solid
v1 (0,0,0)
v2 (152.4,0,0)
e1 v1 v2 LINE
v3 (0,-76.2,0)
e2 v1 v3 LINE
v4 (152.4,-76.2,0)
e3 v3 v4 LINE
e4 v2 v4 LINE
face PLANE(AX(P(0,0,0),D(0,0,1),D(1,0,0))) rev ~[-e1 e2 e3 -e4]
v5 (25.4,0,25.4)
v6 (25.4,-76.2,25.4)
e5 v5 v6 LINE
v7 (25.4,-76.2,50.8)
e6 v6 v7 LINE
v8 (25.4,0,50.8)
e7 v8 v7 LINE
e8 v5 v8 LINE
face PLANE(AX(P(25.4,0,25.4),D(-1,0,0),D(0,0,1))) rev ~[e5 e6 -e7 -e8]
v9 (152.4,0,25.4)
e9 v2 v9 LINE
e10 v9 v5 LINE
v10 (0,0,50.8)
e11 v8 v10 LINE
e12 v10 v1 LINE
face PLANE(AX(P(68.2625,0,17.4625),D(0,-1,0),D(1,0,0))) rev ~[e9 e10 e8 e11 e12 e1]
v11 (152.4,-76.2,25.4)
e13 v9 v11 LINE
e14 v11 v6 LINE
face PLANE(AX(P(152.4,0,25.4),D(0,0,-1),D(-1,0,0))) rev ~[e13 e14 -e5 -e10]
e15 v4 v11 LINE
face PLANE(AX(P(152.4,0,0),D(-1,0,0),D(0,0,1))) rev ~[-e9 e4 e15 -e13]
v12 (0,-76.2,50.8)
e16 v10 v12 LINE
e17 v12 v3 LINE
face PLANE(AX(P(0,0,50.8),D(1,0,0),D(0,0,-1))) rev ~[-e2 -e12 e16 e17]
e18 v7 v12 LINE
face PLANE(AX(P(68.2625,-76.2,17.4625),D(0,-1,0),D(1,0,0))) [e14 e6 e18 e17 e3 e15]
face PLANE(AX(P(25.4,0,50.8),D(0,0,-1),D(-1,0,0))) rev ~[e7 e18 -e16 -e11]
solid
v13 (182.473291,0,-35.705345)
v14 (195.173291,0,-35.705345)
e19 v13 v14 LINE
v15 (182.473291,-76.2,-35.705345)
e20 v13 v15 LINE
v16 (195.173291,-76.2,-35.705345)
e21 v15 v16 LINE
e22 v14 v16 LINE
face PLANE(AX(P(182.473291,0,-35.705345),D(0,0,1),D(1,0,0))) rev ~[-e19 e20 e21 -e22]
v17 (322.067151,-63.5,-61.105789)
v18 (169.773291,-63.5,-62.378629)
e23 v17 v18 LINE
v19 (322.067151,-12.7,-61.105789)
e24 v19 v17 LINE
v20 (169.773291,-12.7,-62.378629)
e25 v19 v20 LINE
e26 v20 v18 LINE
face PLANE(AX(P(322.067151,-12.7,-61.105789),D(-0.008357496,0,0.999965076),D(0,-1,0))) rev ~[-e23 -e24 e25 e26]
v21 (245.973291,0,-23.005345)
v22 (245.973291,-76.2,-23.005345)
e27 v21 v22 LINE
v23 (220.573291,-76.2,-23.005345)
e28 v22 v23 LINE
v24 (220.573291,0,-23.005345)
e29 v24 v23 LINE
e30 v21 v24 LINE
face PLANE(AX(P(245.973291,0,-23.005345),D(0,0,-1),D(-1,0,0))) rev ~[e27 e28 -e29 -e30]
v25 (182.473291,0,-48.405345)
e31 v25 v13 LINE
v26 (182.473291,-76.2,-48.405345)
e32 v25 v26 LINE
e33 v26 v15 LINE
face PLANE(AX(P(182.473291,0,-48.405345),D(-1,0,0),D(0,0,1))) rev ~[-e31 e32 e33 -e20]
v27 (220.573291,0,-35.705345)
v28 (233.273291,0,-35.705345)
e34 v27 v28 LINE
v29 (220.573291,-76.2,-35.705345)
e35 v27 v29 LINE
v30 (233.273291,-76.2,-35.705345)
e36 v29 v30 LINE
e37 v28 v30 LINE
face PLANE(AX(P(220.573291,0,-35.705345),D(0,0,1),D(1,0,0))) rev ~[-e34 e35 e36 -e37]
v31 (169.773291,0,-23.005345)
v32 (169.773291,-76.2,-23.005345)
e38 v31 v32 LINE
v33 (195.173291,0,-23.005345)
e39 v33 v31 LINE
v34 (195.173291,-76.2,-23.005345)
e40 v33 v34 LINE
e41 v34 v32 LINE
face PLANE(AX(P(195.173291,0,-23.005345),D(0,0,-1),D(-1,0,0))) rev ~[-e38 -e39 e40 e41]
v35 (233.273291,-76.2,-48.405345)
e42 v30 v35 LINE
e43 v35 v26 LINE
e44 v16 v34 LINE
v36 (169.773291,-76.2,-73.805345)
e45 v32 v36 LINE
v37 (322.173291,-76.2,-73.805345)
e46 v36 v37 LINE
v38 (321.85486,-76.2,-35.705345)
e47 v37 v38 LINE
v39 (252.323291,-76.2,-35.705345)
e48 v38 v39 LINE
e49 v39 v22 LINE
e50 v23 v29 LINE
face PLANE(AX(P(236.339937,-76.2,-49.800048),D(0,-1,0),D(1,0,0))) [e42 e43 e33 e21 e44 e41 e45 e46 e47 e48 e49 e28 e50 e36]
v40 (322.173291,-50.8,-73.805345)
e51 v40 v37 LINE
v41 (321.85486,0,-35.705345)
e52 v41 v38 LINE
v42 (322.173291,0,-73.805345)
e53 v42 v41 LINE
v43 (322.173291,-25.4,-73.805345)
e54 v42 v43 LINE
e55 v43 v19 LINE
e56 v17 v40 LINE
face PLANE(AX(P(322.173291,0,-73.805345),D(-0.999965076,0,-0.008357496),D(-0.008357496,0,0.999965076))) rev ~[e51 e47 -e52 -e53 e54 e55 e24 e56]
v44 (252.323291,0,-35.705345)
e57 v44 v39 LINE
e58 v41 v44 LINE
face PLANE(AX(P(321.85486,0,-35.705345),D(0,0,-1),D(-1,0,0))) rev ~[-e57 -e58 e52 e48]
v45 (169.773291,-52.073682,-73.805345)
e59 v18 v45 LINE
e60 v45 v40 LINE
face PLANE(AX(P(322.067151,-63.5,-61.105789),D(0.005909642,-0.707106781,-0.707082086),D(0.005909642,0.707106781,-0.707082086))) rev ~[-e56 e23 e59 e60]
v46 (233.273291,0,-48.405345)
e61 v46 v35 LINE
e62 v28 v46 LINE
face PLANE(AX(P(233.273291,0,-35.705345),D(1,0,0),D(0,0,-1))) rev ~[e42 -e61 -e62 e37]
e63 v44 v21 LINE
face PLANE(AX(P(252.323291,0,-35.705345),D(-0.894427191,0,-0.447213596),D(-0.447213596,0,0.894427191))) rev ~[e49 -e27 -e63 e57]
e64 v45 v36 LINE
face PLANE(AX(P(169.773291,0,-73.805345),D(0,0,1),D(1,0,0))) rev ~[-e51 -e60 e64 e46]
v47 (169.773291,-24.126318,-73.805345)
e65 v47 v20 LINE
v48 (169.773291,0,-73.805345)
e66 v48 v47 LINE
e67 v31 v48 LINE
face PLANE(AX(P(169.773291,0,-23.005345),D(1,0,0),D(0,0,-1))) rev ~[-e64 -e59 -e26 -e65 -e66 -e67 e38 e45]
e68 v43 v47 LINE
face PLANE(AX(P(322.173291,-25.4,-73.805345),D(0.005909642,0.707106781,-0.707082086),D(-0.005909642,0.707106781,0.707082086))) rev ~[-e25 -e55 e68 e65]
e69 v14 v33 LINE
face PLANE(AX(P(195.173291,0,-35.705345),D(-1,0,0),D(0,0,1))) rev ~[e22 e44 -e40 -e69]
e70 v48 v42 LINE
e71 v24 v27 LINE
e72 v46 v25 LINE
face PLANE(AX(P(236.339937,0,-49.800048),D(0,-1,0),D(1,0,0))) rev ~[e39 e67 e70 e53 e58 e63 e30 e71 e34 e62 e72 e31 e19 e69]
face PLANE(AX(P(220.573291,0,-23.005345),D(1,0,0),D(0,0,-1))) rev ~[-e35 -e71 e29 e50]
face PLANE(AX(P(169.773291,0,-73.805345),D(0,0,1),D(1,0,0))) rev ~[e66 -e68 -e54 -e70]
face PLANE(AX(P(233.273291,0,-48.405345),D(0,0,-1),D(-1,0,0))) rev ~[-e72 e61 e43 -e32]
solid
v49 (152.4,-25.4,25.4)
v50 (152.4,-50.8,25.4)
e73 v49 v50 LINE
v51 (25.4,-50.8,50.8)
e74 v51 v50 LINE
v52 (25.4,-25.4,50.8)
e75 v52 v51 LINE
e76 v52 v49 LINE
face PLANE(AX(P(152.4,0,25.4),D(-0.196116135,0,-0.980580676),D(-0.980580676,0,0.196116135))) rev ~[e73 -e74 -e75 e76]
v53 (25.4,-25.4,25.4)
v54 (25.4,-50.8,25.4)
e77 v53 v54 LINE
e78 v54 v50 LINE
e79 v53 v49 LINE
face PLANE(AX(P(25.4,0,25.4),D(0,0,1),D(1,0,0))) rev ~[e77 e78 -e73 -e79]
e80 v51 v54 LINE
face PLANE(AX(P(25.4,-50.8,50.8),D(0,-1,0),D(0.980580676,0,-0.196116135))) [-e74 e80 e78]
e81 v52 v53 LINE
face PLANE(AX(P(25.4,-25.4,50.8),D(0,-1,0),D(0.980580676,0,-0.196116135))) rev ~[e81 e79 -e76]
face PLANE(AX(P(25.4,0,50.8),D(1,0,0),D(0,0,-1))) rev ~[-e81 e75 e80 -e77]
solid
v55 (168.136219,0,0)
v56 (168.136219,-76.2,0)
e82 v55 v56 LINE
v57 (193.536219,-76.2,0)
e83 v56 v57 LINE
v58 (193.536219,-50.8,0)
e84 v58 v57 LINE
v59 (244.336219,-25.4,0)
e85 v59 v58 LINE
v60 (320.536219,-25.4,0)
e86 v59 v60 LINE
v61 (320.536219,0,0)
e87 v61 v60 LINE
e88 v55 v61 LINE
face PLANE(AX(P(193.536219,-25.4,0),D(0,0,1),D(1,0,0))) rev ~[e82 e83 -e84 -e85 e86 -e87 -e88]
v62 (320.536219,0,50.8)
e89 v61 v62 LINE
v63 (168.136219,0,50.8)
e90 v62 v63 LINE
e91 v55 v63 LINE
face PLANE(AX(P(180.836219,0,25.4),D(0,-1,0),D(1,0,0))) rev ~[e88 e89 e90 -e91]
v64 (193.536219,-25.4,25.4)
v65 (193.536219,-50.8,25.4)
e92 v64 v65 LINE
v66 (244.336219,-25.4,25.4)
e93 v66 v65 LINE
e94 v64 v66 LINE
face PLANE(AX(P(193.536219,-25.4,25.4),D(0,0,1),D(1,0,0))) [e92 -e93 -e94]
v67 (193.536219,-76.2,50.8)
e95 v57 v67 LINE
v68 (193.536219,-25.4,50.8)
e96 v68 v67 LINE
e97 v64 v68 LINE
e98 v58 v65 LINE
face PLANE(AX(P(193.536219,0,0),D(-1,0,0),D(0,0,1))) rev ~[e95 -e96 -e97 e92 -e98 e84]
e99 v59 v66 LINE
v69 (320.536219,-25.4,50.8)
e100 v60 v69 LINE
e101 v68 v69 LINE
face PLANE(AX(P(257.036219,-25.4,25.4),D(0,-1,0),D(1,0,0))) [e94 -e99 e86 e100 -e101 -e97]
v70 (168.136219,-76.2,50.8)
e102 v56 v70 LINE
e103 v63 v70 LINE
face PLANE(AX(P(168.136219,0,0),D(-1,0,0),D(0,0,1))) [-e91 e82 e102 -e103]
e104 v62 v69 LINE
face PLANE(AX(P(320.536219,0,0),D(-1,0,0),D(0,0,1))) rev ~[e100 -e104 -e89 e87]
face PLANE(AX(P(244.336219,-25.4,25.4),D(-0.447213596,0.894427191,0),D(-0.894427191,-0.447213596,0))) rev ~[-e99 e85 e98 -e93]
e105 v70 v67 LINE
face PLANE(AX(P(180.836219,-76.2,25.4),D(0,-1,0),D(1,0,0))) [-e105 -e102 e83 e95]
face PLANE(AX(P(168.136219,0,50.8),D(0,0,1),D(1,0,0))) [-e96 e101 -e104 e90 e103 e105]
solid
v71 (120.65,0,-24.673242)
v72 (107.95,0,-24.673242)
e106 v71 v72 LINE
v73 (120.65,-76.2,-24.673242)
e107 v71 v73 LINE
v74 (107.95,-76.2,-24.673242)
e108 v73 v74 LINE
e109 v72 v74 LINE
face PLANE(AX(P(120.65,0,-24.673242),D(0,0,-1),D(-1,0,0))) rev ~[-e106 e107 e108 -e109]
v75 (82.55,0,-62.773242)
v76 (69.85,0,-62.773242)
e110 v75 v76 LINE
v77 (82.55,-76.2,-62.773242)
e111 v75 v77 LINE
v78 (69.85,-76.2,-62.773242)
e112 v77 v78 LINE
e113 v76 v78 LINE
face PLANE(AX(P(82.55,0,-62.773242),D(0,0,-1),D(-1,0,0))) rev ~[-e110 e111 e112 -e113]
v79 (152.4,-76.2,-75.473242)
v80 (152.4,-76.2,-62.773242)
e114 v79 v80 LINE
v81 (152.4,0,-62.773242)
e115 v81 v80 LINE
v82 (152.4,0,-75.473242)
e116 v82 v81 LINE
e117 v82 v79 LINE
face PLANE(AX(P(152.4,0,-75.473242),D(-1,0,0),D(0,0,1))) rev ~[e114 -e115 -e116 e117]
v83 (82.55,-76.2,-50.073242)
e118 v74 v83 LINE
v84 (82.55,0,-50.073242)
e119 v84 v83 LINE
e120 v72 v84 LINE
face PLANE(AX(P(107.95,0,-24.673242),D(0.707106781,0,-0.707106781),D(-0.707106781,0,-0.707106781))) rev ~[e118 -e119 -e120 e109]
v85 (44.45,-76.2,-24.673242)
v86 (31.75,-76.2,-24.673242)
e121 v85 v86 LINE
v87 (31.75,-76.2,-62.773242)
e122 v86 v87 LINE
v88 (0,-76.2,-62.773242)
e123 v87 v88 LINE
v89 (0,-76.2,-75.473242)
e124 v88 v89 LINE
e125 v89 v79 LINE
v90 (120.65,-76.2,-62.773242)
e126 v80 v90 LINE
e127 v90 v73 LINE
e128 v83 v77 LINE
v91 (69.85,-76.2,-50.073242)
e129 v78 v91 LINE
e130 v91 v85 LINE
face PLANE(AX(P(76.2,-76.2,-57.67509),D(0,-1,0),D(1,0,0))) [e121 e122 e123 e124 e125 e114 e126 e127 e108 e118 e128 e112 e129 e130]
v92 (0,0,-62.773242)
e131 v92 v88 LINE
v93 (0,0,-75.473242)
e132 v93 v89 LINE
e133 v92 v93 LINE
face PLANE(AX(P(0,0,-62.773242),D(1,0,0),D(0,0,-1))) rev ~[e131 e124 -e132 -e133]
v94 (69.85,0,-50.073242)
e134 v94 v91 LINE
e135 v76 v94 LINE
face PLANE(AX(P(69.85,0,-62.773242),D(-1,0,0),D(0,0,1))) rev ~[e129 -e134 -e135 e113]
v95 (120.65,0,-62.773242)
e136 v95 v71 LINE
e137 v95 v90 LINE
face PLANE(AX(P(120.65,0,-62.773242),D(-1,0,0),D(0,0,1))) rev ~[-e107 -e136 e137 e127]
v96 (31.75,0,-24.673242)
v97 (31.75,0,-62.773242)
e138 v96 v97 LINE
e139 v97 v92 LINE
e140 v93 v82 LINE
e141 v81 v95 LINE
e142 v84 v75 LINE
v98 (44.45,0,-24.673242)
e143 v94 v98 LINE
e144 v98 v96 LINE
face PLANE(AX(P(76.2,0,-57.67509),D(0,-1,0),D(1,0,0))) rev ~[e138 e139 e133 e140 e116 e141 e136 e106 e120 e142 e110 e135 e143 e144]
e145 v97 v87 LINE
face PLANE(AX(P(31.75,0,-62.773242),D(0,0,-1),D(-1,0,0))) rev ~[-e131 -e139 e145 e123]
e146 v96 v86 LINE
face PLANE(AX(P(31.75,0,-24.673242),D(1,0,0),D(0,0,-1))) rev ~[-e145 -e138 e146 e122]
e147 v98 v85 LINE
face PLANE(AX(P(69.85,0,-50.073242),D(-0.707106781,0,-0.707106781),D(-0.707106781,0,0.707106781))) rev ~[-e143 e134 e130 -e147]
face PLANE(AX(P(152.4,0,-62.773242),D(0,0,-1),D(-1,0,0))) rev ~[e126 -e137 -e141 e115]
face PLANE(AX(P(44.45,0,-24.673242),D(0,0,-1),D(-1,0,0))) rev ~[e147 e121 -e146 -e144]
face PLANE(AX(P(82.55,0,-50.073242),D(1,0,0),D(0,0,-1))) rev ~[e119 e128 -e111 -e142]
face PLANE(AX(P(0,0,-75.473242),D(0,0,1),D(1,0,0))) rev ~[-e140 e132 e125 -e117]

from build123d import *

# Parameters (mm, degrees)
F1_DEPTH  = 76.2
F2_DEPTH  = 76.2
F3_W      = 129.5150956453
F3_H      = 25.4
F4_DEPTH  = 25.4
F5_DEPTH  = 25.4
F6_W      = 127
F6_H      = 50.8
F7_DEPTH  = 25.4
F6_W_2    = 25.4
F8_DEPTH  = 76.2
F9_W      = 50.8
F9_H      = 25.4
F10_DEPTH = 25.4
F12_DEPTH = 25.4
F15_DEPTH = 76.2
F16_DEPTH = 76.2
F18_DEPTH = 152.4


with BuildPart() as f1:
    # F0 (on Front) → F1 (new body)
    with BuildSketch(Plane.XZ):
        Polygon((0, 50.8), (0, 0), (152.4, 0), (152.4, 25.4), (25.4, 25.4), (25.4, 50.8), align=None)
    extrude(amount=F1_DEPTH)


with BuildPart() as f2:
    # F0 (on Front) → F2 (new body)
    with BuildSketch(Plane.XZ):
        Polygon((25.4, 25.4), (152.4, 25.4), (25.4, 50.8), align=None)
    extrude(amount=F2_DEPTH)

    # F3 (on face) → F4 (cut)
    with BuildSketch(Plane(origin=(10.7461538462, 0, 53.7307692308), x_dir=(0.9805806757, 0, -0.1961161351), z_dir=(0.1961161351, 0, 0.9805806757))):
        with Locations((79.7015973202, -63.5)):
            Rectangle(F3_W, F3_H)
    extrude(amount=-F4_DEPTH, mode=Mode.SUBTRACT)

    # F3 (on face) → F5 (cut)
    with BuildSketch(Plane(origin=(10.7461538462, 0, 53.7307692308), x_dir=(0.9805806757, 0, -0.1961161351), z_dir=(0.1961161351, 0, 0.9805806757))):
        with Locations((79.7015973202, -12.7)):
            Rectangle(F3_W, F3_H)
    extrude(amount=-F5_DEPTH, mode=Mode.SUBTRACT)


with BuildPart() as f7:
    # F6 (on Front) → F7 (new body)
    with BuildSketch(Plane.XZ):
        with Locations((257.0362193159, 25.4)):
            Rectangle(F6_W, F6_H)
    extrude(amount=F7_DEPTH)

    # F6 (on Front) → F8 (join)
    with BuildSketch(Plane.XZ):
        with Locations((180.8362193159, 25.4)):
            Rectangle(F6_W_2, F6_H)
    extrude(amount=F8_DEPTH)

    # F9 (on face) → F10 (join)
    with BuildSketch(Plane.XZ.offset(25.4)):
        with Locations((218.9362193159, 12.7)):
            Rectangle(F9_W, F9_H)
    extrude(amount=F10_DEPTH)

    # F11 (on face) → F12 (cut)
    with BuildSketch(Plane.XY.offset(25.4)):
        Polygon((244.3362193159, -25.4), (193.5362193159, -50.8), (244.3362193159, -50.8), align=None)
    extrude(amount=-F12_DEPTH, mode=Mode.SUBTRACT)


with BuildPart() as f15:
    # F13 (on Front) → F15 (new body)
    with BuildSketch(Plane.XZ):
        Polygon((0, -62.7732424857), (0, -75.4732424857), (152.4, -75.4732424857), (152.4, -62.7732424857), (120.65, -62.7732424857), (120.65, -24.6732424857), (107.95, -24.6732424857), (82.55, -50.0732424857), (82.55, -62.7732424857), (69.85, -62.7732424857), (69.85, -50.0732424857), (44.45, -24.6732424857), (31.75, -24.6732424857), (31.75, -62.7732424857), align=None)
    extrude(amount=F15_DEPTH)


with BuildPart() as f16:
    # F14 (on Front) → F16 (new body)
    with BuildSketch(Plane.XZ):
        Polygon((169.773291292, -23.0053452725), (169.773291292, -73.8053452725), (322.173291292, -73.8053452725), (321.8548595905, -35.7053452725), (252.323291292, -35.7053452725), (245.973291292, -23.0053452725), (220.573291292, -23.0053452725), (220.573291292, -35.7053452725), (233.273291292, -35.7053452725), (233.273291292, -48.4053452725), (182.473291292, -48.4053452725), (182.473291292, -35.7053452725), (195.173291292, -35.7053452725), (195.173291292, -23.0053452725), align=None)
    extrude(amount=F16_DEPTH)

    # F17 (on face) → F18 (cut)
    with BuildSketch(Plane(origin=(321.5339819162, 0, 2.6873126754), x_dir=(0, 1, 0), z_dir=(0.9999650755, 0, 0.0083574955))):
        Polygon((-63.5, -63.7953295072), (-50.8, -76.4953295072), (-25.4, -76.4953295072), (-12.7, -63.7953295072), align=None)
    extrude(amount=-F18_DEPTH, mode=Mode.SUBTRACT)


solid = Compound([f1.part, f2.part, f7.part, f15.part, f16.part])
